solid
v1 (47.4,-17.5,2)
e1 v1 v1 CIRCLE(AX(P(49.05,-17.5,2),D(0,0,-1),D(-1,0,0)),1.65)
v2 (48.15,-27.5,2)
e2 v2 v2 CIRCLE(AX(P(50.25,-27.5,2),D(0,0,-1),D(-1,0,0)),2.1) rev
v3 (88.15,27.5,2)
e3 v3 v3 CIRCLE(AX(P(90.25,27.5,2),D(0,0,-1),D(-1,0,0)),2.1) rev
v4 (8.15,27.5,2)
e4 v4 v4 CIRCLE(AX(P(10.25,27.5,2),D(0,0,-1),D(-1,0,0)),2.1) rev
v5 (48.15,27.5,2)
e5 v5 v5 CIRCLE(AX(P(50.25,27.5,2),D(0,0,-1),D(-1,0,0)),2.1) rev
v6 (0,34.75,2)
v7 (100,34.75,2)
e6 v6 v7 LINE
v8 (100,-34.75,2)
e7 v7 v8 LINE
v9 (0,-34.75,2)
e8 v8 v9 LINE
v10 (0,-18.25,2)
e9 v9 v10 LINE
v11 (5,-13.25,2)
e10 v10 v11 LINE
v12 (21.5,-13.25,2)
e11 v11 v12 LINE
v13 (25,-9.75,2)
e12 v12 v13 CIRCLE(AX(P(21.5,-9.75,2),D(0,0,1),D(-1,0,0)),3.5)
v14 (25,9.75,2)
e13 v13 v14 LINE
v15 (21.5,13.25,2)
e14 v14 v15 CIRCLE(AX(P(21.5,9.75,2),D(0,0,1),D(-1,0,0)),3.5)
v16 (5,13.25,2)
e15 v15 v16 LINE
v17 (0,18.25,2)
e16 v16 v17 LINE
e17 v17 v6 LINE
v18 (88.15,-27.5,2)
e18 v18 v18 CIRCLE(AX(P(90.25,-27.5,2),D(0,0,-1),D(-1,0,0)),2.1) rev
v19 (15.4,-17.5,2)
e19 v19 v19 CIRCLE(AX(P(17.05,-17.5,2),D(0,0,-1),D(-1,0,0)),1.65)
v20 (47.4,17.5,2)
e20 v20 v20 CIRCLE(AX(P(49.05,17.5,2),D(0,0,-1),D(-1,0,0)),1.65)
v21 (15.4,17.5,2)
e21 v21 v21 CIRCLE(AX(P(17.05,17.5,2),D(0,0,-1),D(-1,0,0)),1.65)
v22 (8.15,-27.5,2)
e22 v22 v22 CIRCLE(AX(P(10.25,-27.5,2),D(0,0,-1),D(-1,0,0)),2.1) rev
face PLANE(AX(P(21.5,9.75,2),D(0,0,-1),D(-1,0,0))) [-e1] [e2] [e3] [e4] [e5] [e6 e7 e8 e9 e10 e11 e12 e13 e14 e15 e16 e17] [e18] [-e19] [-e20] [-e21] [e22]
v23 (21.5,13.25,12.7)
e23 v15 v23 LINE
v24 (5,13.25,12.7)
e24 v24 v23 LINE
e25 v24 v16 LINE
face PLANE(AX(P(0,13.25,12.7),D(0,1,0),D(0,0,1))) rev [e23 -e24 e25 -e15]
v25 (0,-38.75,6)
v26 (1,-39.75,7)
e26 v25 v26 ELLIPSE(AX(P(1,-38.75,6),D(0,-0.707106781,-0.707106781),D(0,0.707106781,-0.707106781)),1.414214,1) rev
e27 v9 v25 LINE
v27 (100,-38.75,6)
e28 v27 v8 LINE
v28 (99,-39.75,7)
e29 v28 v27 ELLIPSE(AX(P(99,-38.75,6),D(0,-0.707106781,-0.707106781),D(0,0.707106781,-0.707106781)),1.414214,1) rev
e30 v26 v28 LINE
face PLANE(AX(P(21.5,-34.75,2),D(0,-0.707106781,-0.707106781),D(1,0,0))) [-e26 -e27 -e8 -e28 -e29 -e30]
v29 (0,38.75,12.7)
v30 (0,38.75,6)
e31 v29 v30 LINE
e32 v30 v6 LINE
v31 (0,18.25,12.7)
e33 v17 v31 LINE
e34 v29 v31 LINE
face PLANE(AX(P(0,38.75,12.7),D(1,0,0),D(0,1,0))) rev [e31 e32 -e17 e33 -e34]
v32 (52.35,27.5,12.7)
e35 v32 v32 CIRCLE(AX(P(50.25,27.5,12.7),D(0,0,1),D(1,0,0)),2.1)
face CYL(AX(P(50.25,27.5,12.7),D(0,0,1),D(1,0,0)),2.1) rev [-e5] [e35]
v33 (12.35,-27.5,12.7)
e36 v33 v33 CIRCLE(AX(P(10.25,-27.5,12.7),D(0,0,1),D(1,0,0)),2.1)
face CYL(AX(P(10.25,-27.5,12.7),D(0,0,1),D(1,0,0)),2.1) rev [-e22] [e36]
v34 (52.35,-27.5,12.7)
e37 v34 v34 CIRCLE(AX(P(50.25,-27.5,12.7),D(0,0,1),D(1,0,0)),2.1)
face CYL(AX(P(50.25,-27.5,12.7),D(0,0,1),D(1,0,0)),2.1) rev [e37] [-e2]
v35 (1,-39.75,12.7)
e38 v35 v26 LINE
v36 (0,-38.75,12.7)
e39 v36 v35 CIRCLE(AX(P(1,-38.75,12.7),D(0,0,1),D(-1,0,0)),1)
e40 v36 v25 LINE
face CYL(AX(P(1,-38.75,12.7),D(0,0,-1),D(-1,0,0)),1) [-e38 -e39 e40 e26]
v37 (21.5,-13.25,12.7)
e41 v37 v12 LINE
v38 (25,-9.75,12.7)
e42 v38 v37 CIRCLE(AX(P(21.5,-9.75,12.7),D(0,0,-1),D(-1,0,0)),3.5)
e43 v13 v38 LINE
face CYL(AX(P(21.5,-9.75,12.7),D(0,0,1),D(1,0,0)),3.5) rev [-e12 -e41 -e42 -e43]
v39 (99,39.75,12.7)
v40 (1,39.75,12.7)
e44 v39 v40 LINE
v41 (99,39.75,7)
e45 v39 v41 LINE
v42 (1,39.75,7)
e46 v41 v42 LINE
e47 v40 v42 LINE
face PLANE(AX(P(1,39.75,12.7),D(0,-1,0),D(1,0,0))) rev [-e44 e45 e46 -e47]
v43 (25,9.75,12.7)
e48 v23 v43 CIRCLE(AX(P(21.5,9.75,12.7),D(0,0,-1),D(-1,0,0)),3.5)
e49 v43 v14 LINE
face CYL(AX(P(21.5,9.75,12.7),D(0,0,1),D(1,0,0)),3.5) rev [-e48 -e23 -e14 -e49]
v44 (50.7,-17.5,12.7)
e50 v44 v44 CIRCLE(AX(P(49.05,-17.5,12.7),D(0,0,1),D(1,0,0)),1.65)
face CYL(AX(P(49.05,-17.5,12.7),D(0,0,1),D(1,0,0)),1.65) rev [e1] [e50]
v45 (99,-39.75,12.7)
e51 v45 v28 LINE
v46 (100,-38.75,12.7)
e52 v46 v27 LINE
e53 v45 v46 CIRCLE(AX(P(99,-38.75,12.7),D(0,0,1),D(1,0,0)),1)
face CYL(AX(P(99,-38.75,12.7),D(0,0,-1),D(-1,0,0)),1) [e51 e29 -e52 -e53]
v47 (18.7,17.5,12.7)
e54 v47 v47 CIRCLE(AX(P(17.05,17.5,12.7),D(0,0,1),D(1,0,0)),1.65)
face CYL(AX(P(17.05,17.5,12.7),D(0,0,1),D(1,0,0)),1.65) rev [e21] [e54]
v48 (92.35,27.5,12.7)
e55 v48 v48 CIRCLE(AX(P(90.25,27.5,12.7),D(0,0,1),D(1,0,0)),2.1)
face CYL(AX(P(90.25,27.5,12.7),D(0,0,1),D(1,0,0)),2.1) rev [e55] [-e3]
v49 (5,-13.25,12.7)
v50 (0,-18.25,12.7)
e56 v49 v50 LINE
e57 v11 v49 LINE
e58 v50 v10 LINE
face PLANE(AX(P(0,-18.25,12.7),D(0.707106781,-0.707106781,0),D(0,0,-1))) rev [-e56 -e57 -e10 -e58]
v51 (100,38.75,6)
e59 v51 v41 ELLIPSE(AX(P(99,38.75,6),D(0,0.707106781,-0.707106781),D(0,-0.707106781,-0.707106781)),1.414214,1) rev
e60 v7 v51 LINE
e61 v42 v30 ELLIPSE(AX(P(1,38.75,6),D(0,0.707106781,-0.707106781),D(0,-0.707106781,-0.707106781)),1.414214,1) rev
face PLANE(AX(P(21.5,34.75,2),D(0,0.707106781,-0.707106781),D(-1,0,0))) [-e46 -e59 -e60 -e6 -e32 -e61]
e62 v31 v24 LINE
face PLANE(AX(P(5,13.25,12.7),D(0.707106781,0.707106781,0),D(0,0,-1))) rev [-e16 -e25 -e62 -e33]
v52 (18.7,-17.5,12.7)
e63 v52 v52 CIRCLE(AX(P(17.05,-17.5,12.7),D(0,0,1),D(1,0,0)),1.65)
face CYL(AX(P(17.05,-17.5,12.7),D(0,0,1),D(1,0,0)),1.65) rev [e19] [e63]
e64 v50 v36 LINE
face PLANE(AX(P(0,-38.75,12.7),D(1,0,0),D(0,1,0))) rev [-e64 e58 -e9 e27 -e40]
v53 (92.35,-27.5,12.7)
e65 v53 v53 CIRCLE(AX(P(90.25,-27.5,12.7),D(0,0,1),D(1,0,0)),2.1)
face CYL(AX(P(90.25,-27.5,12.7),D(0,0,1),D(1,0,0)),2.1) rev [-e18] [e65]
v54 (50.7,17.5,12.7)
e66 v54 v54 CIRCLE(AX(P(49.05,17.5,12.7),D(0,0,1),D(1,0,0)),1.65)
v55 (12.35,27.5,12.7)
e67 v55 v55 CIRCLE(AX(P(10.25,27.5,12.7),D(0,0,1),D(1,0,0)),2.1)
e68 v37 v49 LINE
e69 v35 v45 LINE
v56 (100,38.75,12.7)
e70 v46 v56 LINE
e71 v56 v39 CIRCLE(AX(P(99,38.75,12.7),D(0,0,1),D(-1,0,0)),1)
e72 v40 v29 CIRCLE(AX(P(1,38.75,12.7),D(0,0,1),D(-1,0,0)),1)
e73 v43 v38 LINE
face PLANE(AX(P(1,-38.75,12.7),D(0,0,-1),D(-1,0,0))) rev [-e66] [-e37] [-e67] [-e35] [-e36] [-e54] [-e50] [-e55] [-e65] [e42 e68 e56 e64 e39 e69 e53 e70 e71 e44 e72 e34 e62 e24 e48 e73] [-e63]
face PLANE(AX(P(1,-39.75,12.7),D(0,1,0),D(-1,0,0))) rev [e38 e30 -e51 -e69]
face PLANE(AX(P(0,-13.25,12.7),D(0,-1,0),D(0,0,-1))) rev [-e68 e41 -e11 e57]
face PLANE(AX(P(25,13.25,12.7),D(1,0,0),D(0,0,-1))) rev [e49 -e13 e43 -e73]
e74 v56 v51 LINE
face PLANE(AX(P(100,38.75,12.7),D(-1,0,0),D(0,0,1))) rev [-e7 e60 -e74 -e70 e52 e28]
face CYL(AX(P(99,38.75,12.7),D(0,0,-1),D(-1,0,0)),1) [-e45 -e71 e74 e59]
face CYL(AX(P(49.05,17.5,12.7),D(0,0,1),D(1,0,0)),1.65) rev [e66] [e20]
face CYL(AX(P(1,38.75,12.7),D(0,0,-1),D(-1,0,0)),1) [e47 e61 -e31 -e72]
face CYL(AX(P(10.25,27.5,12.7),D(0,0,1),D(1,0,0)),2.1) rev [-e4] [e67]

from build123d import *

# Parameters (mm, degrees)
BOSS_EXTRUDE1_DEPTH         = 12.7
CHAMFER1_SIZE               = 5
FILLET1_R                   = 3.5
TAP_DRILL_FOR_M5X0_8_TAP1_D = 4.2
CUT_EXTRUDE1_DEPTH          = 2
CHAMFER3_SIZE               = 5
TAP_DRILL_FOR_M4X0_7_TAP1_D = 3.3
CUT_EXTRUDE2_DEPTH          = 2


with BuildPart() as part:
    # Sketch1 → Boss-Extrude1 (new body)
    with BuildSketch(Plane.XY):
        with BuildLine():
            Line((0, 38.75), (0, 13.25))
            Line((0, 13.25), (25, 13.25))
            Line((25, 13.25), (25, -13.25))
            Line((25, -13.25), (0, -13.25))
            Line((0, -13.25), (0, -38.75))
            ThreePointArc((0, -38.75), (0.292893219, -39.457106781), (1, -39.75))
            Line((1, -39.75), (99, -39.75))
            ThreePointArc((99, -39.75), (99.707106781, -39.457106781), (100, -38.75))
            Line((100, -38.75), (100, 38.75))
            ThreePointArc((100, 38.75), (99.707106781, 39.457106781), (99, 39.75))
            Line((99, 39.75), (1, 39.75))
            ThreePointArc((1, 39.75), (0.292893219, 39.457106781), (0, 38.75))
        make_face()
    extrude(amount=BOSS_EXTRUDE1_DEPTH)

    # Chamfer1
    chamfer1_edges = [part.edges().sort_by_distance(p)[0] for p in [
        (0, 13.25, 6.35),
        (0, -13.25, 6.35),
    ]]
    chamfer(chamfer1_edges, length=CHAMFER1_SIZE)

    # Fillet1
    fillet1_edges = [part.edges().sort_by_distance(p)[0] for p in [
        (25, -13.25, 6.35),
        (25, 13.25, 6.35),
    ]]
    fillet(fillet1_edges, radius=FILLET1_R)

    # Tap Drill for M5x0.8 Tap1 (through all)
    with Locations(Plane.XY.offset(12.7)):
        with Locations((10.25, 27.5), (50.25, 27.5), (90.25, 27.5), (90.25, -27.5), (50.25, -27.5), (10.25, -27.5)):
            Hole(TAP_DRILL_FOR_M5X0_8_TAP1_D / 2)

    # Sketch8 → Cut-Extrude1 (cut)
    with BuildSketch(Plane(origin=(0, 0, 0), x_dir=(-1, 0, 0), z_dir=(0, 0, -1))):
        with BuildLine():
            Line((-21.5, 13.25), (-5, 13.25))
            Line((-5, 13.25), (0, 18.25))
            Line((0, 18.25), (0, 38.75))
            ThreePointArc((0, 38.75), (-0.292893219, 39.457106781), (-1, 39.75))
            Line((-1, 39.75), (-99, 39.75))
            ThreePointArc((-99, 39.75), (-99.707106781, 39.457106781), (-100, 38.75))
            Line((-100, 38.75), (-100, -38.75))
            ThreePointArc((-100, -38.75), (-99.707106781, -39.457106781), (-99, -39.75))
            Line((-99, -39.75), (-1, -39.75))
            ThreePointArc((-1, -39.75), (-0.292893219, -39.457106781), (0, -38.75))
            Line((0, -38.75), (0, -18.25))
            Line((0, -18.25), (-5, -13.25))
            Line((-5, -13.25), (-21.5, -13.25))
            ThreePointArc((-21.5, -13.25), (-23.974873734, -12.224873734), (-25, -9.75))
            Line((-25, -9.75), (-25, 9.75))
            ThreePointArc((-25, 9.75), (-23.974873734, 12.224873734), (-21.5, 13.25))
        make_face()
        with BuildLine():
            Line((-84, -12.5), (-41, -12.5))
            ThreePointArc((-41, -12.5), (-38.525126266, -11.474873734), (-37.5, -9))
            Line((-37.5, -9), (-37.5, 9))
            ThreePointArc((-37.5, 9), (-38.525126266, 11.474873734), (-41, 12.5))
            Line((-41, 12.5), (-84, 12.5))
            ThreePointArc((-84, 12.5), (-86.474873734, 11.474873734), (-87.5, 9))
            Line((-87.5, 9), (-87.5, -9))
            ThreePointArc((-87.5, -9), (-86.474873734, -11.474873734), (-84, -12.5))
        make_face(mode=Mode.SUBTRACT)
    extrude(amount=-CUT_EXTRUDE1_DEPTH, mode=Mode.SUBTRACT)

    # Chamfer3
    # the kernel refuses this chamfer: 5 mm, written as the material it takes off along each edge
    with BuildSketch(Plane(origin=(111.85841494, -39.75, 2), x_dir=(0, 0.9996219169112968, -0.02749587661058636), z_dir=(-1, 0, 0)), Plane(origin=(-11.85841494, 39.75, 2), x_dir=(0, -0.9996219169112968, -0.02749587661058636), z_dir=(1, 0, 0))) as chamfer3_piece_1:
        Polygon((CHAMFER3_SIZE * 0.999621916911, -CHAMFER3_SIZE * 0.0274958766106), (-CHAMFER3_SIZE * 0.0274958766106, -CHAMFER3_SIZE * 0.999621916911), (0, 0), align=None)
    extrude(amount=123.71682988, mode=Mode.SUBTRACT)

    # Tap Drill for M4x0.7 Tap1 (through all)
    with Locations(Plane.XY.offset(12.7)):
        with Locations((17.05, 17.5), (17.05, -17.5), (49.05, -17.5), (49.05, 17.5)):
            Hole(TAP_DRILL_FOR_M4X0_7_TAP1_D / 2)

    # Sketch11 → Cut-Extrude2 (cut)
    with BuildSketch(Plane(origin=(0, 0, 0), x_dir=(-1, 0, 0), z_dir=(0, 0, -1))):
        with BuildLine():
            Line((-37.5, -9), (-37.5, 9))
            ThreePointArc((-37.5, 9), (-38.525126266, 11.474873734), (-41, 12.5))
            Line((-41, 12.5), (-84, 12.5))
            ThreePointArc((-84, 12.5), (-86.474873734, 11.474873734), (-87.5, 9))
            Line((-87.5, 9), (-87.5, -9))
            ThreePointArc((-87.5, -9), (-86.474873734, -11.474873734), (-84, -12.5))
            Line((-84, -12.5), (-41, -12.5))
            ThreePointArc((-41, -12.5), (-38.525126266, -11.474873734), (-37.5, -9))
        make_face()
    extrude(amount=-CUT_EXTRUDE2_DEPTH, mode=Mode.SUBTRACT)


solid = part.part
